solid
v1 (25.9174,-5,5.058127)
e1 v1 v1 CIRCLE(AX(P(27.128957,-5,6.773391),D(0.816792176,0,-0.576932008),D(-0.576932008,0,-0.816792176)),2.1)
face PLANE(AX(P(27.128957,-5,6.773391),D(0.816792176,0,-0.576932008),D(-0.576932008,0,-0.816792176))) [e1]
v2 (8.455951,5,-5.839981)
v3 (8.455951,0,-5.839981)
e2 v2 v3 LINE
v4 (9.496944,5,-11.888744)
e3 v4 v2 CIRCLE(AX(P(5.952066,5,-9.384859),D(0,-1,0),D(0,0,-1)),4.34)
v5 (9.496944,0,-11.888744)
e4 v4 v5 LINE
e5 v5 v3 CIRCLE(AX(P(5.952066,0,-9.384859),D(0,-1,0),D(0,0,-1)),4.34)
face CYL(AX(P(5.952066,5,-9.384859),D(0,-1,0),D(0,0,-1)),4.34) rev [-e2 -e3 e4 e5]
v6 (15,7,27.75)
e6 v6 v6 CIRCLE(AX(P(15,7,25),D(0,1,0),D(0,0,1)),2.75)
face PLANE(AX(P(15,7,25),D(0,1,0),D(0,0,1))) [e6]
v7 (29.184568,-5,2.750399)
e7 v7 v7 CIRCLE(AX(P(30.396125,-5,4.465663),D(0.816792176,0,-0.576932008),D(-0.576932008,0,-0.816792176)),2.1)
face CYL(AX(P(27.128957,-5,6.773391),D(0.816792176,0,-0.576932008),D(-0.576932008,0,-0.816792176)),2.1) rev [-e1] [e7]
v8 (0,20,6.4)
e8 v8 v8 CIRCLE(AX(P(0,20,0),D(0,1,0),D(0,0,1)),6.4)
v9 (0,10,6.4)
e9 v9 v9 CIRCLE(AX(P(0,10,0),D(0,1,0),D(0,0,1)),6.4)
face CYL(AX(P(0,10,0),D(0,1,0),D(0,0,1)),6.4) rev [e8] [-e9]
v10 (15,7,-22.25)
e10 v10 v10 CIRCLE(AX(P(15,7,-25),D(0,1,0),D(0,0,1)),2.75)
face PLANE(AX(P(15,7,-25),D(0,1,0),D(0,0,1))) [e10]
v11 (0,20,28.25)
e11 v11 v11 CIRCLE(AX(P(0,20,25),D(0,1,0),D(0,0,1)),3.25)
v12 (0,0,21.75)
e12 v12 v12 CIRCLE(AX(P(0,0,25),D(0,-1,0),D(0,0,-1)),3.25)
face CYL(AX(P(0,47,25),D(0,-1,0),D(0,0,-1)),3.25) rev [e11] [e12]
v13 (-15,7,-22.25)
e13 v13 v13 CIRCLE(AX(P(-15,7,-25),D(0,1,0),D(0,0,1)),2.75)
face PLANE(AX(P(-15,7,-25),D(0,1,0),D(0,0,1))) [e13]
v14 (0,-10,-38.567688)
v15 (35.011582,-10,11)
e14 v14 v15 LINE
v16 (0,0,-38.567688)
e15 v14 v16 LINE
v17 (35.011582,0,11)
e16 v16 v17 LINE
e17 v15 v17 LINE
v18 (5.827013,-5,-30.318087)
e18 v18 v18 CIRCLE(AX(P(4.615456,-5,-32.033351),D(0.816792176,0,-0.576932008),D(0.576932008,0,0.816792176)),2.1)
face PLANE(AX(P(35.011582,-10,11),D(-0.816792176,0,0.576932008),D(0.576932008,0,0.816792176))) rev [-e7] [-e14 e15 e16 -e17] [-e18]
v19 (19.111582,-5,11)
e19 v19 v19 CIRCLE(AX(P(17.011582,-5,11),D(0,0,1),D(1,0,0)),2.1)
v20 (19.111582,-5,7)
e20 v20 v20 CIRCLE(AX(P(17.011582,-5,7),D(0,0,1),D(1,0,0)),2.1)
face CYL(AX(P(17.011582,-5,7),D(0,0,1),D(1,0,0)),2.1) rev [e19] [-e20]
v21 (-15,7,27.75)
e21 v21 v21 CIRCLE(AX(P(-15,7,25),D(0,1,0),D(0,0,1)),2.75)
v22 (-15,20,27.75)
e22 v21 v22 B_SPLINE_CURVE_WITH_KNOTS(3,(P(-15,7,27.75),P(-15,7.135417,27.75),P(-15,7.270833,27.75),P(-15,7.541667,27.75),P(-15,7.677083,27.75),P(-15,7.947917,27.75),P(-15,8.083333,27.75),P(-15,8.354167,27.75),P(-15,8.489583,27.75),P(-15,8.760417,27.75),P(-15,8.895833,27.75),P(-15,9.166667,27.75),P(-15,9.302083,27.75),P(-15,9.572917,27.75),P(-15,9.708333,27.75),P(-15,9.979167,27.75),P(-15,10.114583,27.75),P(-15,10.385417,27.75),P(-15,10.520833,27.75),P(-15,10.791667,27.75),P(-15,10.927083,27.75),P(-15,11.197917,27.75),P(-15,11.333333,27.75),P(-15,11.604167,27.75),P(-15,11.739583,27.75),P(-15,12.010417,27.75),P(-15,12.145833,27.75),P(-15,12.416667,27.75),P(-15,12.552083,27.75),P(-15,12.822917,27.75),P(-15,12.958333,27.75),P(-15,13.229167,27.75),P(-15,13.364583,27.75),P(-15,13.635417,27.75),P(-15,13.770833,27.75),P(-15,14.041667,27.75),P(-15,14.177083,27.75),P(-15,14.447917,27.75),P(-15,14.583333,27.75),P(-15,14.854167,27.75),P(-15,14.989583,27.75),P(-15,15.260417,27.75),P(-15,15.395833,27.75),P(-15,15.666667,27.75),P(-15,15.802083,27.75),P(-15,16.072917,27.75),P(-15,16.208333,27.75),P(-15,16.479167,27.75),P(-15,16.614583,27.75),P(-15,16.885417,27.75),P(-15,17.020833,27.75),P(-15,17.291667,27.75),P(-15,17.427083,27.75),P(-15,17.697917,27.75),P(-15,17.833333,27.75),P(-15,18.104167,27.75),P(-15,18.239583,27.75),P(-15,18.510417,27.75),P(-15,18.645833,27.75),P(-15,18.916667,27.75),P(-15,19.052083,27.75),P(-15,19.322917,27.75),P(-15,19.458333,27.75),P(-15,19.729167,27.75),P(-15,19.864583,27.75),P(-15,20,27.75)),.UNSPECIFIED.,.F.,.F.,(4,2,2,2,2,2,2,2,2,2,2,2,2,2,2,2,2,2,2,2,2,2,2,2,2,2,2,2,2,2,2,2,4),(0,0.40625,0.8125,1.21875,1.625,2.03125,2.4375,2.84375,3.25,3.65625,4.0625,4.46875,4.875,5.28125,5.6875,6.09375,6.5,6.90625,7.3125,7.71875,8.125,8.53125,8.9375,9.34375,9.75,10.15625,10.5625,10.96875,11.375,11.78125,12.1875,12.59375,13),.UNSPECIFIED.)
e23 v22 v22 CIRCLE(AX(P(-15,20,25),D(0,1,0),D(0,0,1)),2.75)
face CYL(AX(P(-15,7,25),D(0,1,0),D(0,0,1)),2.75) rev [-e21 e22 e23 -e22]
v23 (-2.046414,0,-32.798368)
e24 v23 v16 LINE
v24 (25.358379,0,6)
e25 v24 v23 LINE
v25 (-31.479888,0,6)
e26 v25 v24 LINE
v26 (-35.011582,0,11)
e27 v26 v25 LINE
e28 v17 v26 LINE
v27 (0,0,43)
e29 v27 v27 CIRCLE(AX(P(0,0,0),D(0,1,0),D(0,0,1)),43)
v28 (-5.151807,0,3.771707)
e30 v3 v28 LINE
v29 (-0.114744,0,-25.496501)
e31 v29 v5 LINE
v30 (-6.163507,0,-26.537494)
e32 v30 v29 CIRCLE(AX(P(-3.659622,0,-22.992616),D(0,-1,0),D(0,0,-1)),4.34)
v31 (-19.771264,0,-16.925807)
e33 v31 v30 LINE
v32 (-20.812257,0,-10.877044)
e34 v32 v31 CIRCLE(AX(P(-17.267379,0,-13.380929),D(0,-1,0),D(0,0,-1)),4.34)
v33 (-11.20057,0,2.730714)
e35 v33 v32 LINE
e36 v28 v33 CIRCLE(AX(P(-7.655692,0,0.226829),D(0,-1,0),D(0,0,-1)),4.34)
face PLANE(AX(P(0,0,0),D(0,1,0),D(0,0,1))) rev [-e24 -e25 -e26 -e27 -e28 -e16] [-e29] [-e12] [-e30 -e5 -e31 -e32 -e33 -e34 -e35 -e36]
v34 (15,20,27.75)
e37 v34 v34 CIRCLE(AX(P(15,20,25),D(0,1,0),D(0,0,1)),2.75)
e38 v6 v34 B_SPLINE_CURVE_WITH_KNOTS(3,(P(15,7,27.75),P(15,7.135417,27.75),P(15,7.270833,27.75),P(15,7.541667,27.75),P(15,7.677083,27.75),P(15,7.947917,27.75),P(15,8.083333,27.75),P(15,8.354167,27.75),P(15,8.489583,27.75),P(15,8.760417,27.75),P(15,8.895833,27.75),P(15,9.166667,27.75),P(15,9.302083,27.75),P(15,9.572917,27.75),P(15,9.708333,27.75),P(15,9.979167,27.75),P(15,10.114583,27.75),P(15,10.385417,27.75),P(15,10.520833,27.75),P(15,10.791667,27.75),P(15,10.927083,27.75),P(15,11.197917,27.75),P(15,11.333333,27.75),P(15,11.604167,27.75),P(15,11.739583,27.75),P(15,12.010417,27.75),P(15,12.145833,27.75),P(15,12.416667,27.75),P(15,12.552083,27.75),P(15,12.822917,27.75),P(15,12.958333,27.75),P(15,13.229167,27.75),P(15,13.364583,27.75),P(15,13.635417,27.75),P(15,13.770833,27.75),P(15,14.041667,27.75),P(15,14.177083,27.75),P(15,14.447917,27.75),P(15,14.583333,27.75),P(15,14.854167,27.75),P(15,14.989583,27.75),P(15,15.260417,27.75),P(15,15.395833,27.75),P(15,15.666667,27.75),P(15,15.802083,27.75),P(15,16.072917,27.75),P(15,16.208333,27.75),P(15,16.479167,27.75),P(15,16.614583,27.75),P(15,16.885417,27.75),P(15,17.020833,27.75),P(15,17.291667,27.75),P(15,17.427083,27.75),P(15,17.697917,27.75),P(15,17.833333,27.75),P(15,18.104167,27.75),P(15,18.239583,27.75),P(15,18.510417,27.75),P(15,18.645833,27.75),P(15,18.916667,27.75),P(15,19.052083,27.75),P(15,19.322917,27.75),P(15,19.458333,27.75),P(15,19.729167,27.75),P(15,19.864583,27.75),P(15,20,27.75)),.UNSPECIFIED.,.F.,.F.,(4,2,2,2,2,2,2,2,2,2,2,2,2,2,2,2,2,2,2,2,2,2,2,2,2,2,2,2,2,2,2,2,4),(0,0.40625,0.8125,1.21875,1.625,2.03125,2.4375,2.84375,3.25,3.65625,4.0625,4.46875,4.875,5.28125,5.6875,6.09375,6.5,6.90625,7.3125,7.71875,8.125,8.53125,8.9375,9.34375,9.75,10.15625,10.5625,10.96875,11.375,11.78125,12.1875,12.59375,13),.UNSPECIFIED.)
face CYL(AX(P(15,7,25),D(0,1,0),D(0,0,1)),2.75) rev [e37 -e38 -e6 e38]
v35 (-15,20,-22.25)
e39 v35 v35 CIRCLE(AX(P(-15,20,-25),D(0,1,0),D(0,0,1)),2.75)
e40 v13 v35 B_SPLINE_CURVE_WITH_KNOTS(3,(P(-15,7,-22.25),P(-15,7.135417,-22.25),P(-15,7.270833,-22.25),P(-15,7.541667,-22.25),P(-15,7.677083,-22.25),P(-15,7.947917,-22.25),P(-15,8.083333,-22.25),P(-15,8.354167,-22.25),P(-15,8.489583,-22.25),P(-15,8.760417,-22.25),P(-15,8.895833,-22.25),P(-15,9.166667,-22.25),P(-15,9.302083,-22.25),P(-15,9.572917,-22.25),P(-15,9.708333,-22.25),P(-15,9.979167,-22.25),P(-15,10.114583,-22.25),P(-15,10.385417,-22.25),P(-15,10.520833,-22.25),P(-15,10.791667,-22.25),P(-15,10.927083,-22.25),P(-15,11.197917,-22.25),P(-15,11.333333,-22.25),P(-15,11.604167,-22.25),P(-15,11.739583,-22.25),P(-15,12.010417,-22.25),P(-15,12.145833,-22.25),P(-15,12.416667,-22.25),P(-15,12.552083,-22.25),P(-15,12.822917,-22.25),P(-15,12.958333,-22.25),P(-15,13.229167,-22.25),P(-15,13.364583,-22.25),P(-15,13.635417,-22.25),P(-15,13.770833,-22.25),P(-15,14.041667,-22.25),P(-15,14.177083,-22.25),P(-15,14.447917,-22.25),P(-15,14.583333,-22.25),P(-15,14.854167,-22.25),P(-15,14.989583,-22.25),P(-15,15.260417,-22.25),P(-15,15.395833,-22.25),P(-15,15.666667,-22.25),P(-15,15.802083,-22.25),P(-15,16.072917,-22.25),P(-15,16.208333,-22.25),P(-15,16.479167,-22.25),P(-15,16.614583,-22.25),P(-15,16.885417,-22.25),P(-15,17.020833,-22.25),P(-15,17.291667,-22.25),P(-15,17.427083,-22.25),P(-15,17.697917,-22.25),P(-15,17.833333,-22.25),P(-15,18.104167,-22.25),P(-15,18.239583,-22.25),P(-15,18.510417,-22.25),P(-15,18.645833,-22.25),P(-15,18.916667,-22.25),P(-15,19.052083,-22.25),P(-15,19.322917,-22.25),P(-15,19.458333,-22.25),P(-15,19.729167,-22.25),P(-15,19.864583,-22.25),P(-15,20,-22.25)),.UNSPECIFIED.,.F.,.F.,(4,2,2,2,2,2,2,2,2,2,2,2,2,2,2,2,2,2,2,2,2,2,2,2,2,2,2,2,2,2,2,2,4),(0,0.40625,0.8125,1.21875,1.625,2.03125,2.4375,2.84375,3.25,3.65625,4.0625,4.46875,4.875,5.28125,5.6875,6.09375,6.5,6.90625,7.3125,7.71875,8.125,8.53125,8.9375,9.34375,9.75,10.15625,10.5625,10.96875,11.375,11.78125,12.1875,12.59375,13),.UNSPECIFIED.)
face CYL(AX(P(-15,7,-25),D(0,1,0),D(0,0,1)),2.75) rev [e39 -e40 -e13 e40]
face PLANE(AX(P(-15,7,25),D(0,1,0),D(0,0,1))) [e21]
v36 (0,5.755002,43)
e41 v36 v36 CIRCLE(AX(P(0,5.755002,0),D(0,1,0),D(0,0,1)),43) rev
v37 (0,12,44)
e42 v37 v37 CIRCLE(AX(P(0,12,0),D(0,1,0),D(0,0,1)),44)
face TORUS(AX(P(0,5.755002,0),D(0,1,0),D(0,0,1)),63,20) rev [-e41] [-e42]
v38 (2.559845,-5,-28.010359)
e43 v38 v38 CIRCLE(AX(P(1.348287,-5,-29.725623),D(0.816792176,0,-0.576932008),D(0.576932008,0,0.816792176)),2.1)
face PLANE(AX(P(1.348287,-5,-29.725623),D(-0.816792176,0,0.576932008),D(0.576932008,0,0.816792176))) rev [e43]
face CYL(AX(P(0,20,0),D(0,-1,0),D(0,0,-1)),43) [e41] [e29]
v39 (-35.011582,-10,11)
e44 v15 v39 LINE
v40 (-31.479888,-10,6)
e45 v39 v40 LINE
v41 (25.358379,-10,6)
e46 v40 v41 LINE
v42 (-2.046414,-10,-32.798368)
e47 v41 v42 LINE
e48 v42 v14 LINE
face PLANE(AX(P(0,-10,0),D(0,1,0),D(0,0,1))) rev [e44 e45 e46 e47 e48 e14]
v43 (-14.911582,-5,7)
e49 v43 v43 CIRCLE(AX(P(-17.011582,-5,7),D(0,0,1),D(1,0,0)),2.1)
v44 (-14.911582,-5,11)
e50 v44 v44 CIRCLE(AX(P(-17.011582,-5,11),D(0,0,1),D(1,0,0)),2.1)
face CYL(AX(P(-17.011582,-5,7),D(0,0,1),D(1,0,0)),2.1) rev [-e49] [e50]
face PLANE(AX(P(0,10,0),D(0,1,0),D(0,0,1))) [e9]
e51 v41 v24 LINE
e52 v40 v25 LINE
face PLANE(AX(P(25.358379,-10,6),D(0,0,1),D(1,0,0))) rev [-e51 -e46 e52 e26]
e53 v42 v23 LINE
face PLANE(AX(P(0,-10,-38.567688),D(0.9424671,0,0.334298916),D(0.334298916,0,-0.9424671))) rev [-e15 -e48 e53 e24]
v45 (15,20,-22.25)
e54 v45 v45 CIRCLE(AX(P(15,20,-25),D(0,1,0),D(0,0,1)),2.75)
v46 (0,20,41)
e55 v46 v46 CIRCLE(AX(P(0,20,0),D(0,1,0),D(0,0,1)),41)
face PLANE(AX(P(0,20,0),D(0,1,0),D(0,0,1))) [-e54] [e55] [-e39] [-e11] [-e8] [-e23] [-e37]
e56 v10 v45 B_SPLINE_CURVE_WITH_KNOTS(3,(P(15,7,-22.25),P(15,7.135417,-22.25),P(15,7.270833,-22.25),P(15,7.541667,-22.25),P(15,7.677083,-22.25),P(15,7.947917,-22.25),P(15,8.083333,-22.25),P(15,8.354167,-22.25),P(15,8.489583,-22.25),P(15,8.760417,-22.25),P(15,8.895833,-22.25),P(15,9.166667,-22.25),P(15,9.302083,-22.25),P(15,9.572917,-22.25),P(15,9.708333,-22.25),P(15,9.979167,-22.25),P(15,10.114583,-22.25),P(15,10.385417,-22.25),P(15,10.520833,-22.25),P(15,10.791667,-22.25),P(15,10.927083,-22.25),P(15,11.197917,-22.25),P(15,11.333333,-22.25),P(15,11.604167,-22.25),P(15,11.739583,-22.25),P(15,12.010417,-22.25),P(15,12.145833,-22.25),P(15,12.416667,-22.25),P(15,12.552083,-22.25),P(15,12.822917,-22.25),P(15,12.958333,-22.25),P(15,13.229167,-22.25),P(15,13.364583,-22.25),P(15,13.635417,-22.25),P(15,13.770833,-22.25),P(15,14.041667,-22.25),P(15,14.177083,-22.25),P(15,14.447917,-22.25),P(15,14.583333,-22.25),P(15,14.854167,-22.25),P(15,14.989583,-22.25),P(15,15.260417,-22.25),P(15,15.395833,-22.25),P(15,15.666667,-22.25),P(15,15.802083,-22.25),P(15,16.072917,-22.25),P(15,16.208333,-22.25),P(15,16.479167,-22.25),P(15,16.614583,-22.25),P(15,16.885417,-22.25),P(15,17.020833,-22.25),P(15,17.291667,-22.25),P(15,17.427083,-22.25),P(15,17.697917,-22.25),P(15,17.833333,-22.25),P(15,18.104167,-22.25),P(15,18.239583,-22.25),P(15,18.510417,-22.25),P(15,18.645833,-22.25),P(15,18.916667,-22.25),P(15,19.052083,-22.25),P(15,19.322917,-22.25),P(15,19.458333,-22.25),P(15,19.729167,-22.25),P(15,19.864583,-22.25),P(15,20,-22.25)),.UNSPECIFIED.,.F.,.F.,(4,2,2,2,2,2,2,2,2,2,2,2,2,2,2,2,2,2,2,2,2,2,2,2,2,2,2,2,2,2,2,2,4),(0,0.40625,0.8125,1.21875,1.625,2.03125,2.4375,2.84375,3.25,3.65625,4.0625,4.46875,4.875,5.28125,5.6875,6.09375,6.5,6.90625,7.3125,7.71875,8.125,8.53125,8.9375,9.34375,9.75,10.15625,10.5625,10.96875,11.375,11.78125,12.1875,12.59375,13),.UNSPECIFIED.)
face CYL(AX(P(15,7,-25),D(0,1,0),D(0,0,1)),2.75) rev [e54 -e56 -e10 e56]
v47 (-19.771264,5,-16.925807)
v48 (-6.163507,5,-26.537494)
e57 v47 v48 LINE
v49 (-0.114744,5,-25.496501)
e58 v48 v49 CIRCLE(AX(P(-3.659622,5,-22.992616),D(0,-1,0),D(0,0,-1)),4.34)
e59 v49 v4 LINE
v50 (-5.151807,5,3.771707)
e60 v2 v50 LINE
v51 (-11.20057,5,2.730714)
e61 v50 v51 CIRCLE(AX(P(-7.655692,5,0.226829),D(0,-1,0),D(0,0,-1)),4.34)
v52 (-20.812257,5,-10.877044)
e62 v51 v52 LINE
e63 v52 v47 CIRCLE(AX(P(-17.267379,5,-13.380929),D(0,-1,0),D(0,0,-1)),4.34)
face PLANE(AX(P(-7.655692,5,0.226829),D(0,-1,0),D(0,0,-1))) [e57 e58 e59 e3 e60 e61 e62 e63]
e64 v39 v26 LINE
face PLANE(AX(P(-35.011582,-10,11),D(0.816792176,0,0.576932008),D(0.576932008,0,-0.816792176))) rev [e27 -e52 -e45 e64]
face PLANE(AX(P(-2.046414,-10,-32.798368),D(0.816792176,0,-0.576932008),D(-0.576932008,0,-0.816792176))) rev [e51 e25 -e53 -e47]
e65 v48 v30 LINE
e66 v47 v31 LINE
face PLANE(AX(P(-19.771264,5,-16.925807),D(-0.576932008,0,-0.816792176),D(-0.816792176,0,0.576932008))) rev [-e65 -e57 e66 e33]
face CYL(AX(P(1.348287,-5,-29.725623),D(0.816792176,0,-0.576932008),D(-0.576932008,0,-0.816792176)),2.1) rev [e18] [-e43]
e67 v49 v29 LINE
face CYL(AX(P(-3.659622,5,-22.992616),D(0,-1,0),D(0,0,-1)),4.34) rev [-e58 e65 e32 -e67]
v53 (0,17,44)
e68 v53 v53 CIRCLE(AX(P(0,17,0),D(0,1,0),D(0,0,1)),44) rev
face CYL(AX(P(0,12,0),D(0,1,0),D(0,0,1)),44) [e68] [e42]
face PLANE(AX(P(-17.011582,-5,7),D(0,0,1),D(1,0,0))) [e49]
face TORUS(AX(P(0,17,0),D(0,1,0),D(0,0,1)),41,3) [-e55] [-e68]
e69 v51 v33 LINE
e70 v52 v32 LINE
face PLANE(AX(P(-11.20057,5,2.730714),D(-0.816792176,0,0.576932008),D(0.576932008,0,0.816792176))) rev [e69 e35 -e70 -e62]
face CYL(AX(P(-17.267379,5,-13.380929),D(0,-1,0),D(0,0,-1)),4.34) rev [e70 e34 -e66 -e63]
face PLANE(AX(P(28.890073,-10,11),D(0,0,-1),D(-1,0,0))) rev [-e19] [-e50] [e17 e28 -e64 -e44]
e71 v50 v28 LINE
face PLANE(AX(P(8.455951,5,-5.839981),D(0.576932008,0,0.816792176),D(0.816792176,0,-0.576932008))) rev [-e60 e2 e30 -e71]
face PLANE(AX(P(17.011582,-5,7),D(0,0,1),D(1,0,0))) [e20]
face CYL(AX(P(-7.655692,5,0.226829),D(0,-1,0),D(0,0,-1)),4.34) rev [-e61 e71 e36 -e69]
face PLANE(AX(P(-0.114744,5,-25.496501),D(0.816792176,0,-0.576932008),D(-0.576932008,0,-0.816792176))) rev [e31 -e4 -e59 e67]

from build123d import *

# Parameters (mm, degrees)
SKETCH1_R             = 43
BOSS_EXTRUDE1_DEPTH   = 20
SKETCH2_R             = 44
BOSS_EXTRUDE2_DEPTH   = 8
FILLET1_R             = 20
BOSS_EXTRUDE3_DEPTH   = 10
SKETCH5_R             = 2.1
CUT_EXTRUDE1_DEPTH    = 4
CUT_EXTRUDE2_DEPTH    = 5
FILLET2_R             = 3
BOSS_EXTRUDE4_DEPTH   = 10
SKETCH10_R            = 2.1
CUT_EXTRUDE3_DEPTH    = 4
SKETCH11_R            = 3.25
CUT_EXTRUDE4_DEPTH    = 47
CROQUIS1_R            = 2.75
CORTAR_EXTRUIR1_DEPTH = 13
CROQUIS2_R            = 6.4
CORTAR_EXTRUIR2_DEPTH = 10


with BuildPart() as part:
    # Sketch1 → Boss-Extrude1 (new body)
    with BuildSketch(Plane(origin=(0, 0, 0), x_dir=(1, 0, 0), z_dir=(0, 1, 0))):
        with Locations(Location((0, 0, 0), (0, 0, 270))):
            Circle(SKETCH1_R)
    extrude(amount=BOSS_EXTRUDE1_DEPTH)

    # Sketch2 → Boss-Extrude2 (add)
    with BuildSketch(Plane(origin=(0, 20, 0), x_dir=(1, 0, 0), z_dir=(0, 1, 0))):
        with Locations(Location((0, 0, 0), (0, 0, 270))):
            Circle(SKETCH2_R)
    extrude(amount=-BOSS_EXTRUDE2_DEPTH)

    # Fillet1
    # the kernel refuses this fillet: 20 mm, written as the material it adds along each edge
    with BuildSketch(Plane(origin=(0, 12, 0), x_dir=(0, 0, 1), z_dir=(1, 0, 0))) as fillet1_piece_1:
        with BuildLine():
            CenterArc((63, 6.244997998), FILLET1_R, 180, 18.194872339)
            Line((44, 0), (43, 0))
            Line((43, 0), (43, 6.244997998))
        make_face()
    revolve(axis=Axis((0, 12, 0), (0, -1, 0)))

    # Sketch4 → Boss-Extrude3 (add)
    with BuildSketch(Plane.XZ):
        Polygon((28.890073358, 11), (35.011581558, 11), (0, -38.567688166), (-2.046413556, -32.798368085), align=None)
    extrude(amount=BOSS_EXTRUDE3_DEPTH)

    # Sketch5 → Cut-Extrude1 (cut)
    with BuildSketch(Plane(origin=(18.174388611, 0, -12.837275908), x_dir=(-0.576932008090494, 0, -0.8167921755505927), z_dir=(0.8167921755505927, 0, -0.576932008090494))):
        with Locations((-21.184015986, -5)):
            Circle(SKETCH5_R)
        with Locations(Location((23.501785923, -5, 0), (0, 0, 180))):
            Circle(SKETCH5_R)
    extrude(amount=-CUT_EXTRUDE1_DEPTH, mode=Mode.SUBTRACT)

    # Sketch7 → Cut-Extrude2 (cut)
    with BuildSketch(Plane.XZ):
        with BuildLine():
            Line((8.455950561, -5.839980603), (-5.151807084, 3.771706651))
            ThreePointArc((-5.151807084, 3.771706651), (-8.391785298, 4.503949914), (-11.200570041, 2.730713525))
            Line((-11.200570041, 2.730713525), (-20.812257296, -10.87704412))
            ThreePointArc((-20.812257296, -10.87704412), (-21.544500559, -14.117022334), (-19.771264169, -16.925807077))
            Line((-19.771264169, -16.925807077), (-6.163506524, -26.537494332))
            ThreePointArc((-6.163506524, -26.537494332), (-2.92352831, -27.269737595), (-0.114743567, -25.496501205))
            Line((-0.114743567, -25.496501205), (9.496943688, -11.88874356))
            ThreePointArc((9.496943688, -11.88874356), (10.22918695, -8.648765346), (8.455950561, -5.839980603))
        make_face()
    extrude(amount=-CUT_EXTRUDE2_DEPTH, mode=Mode.SUBTRACT)

    # Fillet2
    fillet2_edges = [part.edges().sort_by_distance(p)[0] for p in [
        (0, 20, -44),
    ]]
    fillet(fillet2_edges, radius=FILLET2_R)

    # Sketch8 → Boss-Extrude4 (add)
    with BuildSketch(Plane.XZ):
        Polygon((28.890073358, 11), (-35.011581558, 11), (-31.47988754, 6), (25.35837934, 6), align=None)
    extrude(amount=BOSS_EXTRUDE4_DEPTH)

    # Sketch10 → Cut-Extrude3 (cut)
    with BuildSketch(Plane.XY.offset(11)):
        with Locations((-17.011581558, -5)):
            Circle(SKETCH10_R)
        with Locations((17.011581558, -5)):
            Circle(SKETCH10_R)
    extrude(amount=-CUT_EXTRUDE3_DEPTH, mode=Mode.SUBTRACT)

    # Sketch11 → Cut-Extrude4 (cut)
    with BuildSketch(Plane.XZ):
        with Locations(Location((0, 25, 0), (0, 0, 270))):
            Circle(SKETCH11_R)
    extrude(amount=-CUT_EXTRUDE4_DEPTH, mode=Mode.SUBTRACT)

    # Croquis1 → Cortar-Extruir1 (cut)
    with BuildSketch(Plane(origin=(0, 20, 0), x_dir=(1, 0, 0), z_dir=(0, 1, 0))):
        with Locations(Location((-15, 25, 0), (0, 0, 270))):
            Circle(CROQUIS1_R)
        with Locations(Location((15, 25, 0), (0, 0, 270))):
            Circle(CROQUIS1_R)
        with Locations(Location((15, -25, 0), (0, 0, 270))):
            Circle(CROQUIS1_R)
        with Locations(Location((-15, -25, 0), (0, 0, 270))):
            Circle(CROQUIS1_R)
    extrude(amount=-CORTAR_EXTRUIR1_DEPTH, mode=Mode.SUBTRACT)

    # Croquis2 → Cortar-Extruir2 (cut)
    with BuildSketch(Plane(origin=(0, 20, 0), x_dir=(1, 0, 0), z_dir=(0, 1, 0))):
        with Locations(Location((0, 0, 0), (0, 0, 270))):
            Circle(CROQUIS2_R)
    extrude(amount=-CORTAR_EXTRUIR2_DEPTH, mode=Mode.SUBTRACT)


solid = part.part
